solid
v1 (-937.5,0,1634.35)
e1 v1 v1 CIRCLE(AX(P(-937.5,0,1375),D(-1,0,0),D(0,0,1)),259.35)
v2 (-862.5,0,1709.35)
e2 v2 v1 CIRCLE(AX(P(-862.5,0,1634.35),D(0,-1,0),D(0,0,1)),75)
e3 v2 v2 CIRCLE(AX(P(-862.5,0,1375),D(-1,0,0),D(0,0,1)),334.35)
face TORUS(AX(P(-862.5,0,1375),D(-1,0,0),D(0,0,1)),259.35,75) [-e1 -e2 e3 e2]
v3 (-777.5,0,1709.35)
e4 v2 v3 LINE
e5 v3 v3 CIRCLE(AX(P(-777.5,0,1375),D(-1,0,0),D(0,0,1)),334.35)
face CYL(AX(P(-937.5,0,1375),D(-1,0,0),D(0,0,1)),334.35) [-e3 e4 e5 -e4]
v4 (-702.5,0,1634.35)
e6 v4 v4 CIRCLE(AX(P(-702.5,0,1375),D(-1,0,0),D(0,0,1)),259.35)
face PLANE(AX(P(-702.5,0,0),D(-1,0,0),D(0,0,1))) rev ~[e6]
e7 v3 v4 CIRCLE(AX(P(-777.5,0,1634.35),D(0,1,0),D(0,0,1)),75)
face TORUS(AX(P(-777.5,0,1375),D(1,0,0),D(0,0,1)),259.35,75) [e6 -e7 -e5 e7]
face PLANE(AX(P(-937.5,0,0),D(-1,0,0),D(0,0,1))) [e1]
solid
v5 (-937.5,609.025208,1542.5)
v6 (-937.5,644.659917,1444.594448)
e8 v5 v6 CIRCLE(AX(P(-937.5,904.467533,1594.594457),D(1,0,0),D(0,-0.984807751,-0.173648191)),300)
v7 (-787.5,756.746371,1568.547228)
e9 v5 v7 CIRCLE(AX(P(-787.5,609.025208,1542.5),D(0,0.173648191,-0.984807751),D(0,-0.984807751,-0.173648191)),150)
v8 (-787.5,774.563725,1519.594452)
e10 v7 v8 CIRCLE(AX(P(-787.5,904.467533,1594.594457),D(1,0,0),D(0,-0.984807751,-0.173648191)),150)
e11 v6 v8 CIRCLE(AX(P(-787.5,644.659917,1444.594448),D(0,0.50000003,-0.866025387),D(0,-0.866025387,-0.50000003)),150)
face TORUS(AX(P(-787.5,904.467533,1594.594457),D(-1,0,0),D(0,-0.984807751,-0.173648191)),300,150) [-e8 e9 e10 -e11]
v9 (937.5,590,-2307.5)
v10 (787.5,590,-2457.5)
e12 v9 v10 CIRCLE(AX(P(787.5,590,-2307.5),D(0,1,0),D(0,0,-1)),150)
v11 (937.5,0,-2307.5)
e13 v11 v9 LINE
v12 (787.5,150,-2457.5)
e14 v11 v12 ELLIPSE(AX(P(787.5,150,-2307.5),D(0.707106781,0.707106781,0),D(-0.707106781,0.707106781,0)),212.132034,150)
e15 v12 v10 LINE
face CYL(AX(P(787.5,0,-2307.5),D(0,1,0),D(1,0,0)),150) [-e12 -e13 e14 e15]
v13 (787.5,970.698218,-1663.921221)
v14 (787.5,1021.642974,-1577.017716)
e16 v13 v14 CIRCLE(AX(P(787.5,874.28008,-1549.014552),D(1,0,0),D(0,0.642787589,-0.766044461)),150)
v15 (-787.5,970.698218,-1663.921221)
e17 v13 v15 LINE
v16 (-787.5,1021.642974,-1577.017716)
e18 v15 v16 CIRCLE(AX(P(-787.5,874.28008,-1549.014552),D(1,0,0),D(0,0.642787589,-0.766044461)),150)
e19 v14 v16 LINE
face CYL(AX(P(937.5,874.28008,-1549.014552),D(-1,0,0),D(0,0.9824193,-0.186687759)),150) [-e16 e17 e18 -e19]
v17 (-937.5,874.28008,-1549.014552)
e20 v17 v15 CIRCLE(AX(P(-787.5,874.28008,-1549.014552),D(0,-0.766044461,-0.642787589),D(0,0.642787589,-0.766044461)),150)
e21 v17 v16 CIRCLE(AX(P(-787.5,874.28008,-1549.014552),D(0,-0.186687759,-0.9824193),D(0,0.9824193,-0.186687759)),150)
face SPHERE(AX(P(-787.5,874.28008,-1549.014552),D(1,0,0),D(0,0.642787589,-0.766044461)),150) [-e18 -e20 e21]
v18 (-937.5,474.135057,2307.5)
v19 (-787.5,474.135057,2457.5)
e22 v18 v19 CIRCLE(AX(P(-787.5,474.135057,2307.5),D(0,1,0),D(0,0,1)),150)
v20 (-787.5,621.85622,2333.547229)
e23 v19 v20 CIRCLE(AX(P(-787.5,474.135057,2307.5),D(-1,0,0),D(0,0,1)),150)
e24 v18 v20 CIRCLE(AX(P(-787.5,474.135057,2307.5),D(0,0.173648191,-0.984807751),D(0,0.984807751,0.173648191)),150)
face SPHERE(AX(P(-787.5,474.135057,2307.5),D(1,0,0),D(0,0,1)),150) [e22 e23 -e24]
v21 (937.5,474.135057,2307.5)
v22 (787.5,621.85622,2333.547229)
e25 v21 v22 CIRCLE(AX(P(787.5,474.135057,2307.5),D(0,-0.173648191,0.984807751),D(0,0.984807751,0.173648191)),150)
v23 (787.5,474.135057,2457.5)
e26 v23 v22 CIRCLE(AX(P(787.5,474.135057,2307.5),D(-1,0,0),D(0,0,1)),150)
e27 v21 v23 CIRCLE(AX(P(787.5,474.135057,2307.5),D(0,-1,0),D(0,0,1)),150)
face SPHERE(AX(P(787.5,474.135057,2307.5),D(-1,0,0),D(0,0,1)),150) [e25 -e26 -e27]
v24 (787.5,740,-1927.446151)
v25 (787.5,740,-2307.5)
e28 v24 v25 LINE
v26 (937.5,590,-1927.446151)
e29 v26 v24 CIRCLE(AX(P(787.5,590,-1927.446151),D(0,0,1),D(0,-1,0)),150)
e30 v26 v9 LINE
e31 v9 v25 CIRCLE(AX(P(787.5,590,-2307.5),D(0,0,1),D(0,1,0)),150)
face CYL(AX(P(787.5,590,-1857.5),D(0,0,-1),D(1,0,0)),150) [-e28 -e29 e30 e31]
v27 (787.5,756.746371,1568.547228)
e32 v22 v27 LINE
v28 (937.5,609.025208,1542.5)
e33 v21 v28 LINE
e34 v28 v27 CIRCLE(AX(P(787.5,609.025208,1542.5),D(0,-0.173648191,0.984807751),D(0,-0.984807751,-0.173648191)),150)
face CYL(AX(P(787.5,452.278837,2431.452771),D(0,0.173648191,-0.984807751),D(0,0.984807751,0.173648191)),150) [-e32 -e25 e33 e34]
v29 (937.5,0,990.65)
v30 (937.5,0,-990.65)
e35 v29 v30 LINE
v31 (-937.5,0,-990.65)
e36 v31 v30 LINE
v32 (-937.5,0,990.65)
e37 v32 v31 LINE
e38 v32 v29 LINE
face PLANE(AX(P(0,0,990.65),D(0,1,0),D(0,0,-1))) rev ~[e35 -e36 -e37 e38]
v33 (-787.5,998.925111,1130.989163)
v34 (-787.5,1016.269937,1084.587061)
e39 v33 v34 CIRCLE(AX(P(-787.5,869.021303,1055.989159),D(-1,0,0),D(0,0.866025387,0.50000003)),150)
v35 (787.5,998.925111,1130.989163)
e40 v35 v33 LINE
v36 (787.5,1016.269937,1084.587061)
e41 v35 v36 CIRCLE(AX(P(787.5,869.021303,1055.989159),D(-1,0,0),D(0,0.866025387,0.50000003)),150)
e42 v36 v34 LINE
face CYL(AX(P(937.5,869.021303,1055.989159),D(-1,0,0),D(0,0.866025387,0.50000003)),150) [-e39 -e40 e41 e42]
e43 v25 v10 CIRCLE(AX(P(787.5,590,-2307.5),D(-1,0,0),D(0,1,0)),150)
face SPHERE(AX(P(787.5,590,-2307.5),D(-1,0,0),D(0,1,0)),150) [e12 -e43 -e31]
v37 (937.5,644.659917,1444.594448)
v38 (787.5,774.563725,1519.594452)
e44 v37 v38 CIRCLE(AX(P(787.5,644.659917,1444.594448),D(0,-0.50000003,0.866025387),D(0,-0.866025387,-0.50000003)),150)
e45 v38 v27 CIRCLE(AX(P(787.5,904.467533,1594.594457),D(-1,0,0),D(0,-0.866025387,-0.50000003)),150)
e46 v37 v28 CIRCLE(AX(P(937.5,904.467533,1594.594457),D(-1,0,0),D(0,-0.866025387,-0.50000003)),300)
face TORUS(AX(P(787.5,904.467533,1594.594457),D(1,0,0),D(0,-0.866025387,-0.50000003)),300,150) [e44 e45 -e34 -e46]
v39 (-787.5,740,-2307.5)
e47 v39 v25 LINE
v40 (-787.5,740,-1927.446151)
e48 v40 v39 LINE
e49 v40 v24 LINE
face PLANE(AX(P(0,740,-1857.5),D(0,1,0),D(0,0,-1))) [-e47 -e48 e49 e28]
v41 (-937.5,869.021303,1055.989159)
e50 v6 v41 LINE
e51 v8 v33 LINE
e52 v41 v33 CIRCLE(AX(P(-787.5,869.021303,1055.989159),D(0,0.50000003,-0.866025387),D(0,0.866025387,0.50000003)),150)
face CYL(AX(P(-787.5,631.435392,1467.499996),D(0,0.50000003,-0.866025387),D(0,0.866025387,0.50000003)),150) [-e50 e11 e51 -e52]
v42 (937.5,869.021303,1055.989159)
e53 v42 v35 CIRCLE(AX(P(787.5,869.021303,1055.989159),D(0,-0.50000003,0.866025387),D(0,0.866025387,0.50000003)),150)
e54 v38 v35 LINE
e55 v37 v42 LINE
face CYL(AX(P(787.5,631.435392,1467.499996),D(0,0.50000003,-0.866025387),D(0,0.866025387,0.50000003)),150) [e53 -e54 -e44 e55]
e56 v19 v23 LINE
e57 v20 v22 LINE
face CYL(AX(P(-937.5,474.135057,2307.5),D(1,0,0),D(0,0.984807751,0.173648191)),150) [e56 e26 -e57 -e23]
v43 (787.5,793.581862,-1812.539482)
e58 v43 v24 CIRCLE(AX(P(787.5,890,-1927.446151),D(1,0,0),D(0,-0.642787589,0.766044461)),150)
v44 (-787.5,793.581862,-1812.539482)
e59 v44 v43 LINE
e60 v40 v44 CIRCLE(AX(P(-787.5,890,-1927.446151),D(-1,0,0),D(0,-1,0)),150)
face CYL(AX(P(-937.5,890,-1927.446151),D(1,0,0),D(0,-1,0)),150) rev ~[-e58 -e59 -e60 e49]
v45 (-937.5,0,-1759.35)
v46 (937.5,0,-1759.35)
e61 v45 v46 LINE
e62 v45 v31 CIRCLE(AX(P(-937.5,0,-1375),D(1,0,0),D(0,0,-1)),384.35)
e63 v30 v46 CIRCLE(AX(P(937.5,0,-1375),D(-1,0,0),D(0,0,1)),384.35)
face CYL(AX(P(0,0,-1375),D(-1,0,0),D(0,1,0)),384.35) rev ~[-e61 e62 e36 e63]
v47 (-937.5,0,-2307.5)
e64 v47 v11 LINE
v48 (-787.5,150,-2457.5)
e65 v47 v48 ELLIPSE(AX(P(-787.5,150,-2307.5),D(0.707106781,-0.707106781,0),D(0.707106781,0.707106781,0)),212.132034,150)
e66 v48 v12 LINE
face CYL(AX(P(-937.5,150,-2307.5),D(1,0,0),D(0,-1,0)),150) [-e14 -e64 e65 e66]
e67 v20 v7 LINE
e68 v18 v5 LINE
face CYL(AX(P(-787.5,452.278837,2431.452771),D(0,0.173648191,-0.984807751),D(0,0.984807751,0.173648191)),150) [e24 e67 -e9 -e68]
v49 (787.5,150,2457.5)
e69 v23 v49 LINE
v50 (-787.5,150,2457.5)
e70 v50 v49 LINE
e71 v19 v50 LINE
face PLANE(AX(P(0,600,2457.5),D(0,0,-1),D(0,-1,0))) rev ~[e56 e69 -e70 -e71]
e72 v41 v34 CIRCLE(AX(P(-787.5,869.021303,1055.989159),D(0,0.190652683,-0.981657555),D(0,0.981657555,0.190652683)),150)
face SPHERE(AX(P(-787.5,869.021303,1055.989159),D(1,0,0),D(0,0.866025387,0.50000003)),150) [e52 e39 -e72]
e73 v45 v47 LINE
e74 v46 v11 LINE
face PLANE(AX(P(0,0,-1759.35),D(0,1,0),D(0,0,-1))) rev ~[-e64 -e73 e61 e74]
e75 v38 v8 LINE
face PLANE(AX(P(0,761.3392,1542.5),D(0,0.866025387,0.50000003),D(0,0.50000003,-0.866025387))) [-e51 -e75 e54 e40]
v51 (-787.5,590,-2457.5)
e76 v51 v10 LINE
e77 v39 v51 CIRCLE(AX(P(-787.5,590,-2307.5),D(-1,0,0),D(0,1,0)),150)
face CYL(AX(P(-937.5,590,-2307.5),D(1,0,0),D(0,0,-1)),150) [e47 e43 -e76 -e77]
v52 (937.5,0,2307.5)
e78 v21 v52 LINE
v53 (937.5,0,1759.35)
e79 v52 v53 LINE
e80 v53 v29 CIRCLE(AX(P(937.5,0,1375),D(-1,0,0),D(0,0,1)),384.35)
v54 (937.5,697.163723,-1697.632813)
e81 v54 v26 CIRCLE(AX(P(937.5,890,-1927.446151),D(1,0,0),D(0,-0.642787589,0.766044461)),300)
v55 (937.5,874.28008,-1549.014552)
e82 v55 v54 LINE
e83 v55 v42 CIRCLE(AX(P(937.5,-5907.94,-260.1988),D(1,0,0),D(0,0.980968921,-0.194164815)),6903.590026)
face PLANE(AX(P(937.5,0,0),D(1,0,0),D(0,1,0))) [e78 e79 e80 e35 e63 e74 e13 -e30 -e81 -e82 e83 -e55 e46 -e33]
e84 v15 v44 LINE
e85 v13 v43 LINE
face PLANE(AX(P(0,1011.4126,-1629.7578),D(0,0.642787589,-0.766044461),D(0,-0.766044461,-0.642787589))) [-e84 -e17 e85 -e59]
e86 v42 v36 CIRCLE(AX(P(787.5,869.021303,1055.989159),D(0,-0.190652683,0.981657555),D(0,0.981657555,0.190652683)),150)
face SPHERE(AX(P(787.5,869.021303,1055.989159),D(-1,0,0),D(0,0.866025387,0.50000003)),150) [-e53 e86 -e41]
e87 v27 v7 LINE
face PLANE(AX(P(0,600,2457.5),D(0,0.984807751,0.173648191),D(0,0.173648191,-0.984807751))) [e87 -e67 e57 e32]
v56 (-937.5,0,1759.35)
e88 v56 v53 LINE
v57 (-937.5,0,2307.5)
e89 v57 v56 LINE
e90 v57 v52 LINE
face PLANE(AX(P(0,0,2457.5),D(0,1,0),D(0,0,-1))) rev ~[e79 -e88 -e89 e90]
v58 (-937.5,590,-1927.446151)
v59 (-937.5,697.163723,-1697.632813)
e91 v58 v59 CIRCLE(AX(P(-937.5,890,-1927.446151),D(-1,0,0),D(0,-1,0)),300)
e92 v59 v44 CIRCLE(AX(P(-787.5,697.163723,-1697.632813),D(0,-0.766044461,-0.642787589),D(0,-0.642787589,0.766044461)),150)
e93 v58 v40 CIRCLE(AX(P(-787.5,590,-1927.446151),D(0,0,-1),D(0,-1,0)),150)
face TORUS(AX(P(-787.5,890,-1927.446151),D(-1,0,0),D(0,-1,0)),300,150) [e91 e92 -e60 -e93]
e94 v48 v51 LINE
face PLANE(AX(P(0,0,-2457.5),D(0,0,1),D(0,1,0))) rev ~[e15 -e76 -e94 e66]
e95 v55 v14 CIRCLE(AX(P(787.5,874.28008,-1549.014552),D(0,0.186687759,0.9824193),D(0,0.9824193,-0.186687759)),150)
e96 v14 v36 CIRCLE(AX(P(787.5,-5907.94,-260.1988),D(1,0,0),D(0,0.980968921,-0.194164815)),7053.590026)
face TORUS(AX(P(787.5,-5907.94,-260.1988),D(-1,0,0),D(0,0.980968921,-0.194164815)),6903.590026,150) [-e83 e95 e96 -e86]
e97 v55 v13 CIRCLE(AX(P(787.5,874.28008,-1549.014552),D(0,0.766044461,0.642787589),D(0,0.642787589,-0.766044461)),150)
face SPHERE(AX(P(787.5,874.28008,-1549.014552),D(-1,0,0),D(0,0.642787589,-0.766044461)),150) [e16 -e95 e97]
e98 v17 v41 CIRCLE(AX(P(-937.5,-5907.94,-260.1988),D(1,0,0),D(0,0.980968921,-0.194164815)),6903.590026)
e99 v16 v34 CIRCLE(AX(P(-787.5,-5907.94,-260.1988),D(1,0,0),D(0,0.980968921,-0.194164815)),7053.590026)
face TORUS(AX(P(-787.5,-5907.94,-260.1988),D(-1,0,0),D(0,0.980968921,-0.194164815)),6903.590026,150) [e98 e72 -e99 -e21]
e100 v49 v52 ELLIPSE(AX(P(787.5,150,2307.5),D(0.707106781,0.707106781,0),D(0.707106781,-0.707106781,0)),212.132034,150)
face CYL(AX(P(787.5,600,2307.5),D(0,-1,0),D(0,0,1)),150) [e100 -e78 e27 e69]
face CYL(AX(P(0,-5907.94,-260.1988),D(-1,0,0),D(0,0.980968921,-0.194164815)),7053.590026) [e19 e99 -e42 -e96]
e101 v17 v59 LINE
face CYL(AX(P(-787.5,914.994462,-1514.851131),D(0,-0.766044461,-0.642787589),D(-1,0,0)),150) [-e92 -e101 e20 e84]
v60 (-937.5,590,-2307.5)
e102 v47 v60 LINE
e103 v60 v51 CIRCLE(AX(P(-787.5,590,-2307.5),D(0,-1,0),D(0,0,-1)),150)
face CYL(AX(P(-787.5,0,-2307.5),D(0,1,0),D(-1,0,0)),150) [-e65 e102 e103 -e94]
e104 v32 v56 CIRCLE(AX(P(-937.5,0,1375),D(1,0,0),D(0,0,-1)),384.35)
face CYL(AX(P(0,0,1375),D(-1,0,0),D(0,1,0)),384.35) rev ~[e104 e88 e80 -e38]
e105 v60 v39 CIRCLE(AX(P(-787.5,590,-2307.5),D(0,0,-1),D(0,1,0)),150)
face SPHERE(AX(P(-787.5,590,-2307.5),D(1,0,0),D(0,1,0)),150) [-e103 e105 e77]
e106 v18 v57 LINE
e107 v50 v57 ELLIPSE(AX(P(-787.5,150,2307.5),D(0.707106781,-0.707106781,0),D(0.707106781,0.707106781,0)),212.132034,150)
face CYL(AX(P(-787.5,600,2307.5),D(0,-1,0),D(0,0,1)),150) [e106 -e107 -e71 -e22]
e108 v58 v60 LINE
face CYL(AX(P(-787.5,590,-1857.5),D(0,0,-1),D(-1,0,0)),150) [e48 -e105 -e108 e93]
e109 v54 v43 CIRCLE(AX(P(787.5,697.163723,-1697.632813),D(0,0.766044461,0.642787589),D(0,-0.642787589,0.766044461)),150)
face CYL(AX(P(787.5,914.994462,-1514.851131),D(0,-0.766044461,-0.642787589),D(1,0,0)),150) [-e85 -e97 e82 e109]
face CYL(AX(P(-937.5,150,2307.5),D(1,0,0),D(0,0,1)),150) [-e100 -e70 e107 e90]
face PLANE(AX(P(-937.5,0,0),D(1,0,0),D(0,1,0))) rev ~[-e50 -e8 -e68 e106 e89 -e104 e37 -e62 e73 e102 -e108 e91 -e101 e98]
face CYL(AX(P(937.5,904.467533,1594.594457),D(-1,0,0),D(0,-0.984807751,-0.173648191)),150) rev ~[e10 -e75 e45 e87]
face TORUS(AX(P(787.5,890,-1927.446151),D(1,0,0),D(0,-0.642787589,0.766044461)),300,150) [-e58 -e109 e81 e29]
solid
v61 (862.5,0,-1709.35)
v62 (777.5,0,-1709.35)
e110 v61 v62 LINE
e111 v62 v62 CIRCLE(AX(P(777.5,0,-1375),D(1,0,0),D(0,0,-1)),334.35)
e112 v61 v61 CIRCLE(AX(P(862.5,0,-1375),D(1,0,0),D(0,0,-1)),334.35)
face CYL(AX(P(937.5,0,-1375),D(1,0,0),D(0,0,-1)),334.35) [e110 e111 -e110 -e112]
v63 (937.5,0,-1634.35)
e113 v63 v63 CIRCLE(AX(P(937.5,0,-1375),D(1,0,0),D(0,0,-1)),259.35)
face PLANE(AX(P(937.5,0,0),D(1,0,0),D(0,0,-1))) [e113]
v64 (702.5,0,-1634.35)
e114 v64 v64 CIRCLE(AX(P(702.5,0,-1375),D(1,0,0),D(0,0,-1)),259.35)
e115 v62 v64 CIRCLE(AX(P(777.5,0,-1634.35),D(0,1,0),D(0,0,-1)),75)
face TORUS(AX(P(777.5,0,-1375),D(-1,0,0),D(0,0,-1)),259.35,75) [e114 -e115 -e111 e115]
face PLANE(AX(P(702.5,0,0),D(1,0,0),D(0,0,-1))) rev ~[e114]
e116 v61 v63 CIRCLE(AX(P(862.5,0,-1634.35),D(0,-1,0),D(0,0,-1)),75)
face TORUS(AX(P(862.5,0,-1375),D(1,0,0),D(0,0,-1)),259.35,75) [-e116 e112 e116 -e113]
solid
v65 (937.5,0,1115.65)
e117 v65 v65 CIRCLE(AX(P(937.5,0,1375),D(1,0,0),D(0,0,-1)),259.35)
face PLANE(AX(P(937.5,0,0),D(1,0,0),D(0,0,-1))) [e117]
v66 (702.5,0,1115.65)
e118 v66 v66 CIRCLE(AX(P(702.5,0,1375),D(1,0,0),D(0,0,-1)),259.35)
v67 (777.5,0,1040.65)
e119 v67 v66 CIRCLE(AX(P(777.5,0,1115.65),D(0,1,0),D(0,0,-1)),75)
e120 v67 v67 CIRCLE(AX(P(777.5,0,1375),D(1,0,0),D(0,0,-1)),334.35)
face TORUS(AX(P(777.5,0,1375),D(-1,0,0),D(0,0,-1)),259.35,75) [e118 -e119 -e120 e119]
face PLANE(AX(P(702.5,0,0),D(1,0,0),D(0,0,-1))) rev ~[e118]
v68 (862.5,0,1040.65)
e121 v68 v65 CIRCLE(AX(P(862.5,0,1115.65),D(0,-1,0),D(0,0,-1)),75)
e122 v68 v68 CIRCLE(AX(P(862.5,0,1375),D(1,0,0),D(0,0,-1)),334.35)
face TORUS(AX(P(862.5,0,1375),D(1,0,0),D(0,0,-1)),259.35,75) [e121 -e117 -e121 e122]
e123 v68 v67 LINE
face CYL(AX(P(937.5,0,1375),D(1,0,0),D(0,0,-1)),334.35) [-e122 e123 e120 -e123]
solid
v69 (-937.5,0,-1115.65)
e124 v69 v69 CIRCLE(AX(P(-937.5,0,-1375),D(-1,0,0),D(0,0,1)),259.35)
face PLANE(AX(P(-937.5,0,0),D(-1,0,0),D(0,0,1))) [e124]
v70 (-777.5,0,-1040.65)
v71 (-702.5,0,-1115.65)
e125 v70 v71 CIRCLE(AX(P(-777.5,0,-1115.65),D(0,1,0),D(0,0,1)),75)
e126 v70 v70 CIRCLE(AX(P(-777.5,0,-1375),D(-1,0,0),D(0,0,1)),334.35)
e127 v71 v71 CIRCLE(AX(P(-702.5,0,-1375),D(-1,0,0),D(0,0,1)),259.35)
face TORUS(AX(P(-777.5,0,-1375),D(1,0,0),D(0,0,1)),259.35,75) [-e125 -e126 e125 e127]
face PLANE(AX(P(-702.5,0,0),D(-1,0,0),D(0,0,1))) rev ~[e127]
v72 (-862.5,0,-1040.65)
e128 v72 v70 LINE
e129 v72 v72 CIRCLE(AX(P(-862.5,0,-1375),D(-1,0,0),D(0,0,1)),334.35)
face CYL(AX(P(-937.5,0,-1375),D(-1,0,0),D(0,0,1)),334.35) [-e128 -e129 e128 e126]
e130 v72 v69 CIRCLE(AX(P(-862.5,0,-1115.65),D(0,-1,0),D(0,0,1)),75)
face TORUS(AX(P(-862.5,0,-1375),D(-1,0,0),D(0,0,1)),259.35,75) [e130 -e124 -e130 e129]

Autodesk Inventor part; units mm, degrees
ref_plane "YZ Plane" through (0, 0, 0) normal (1, 0, 0) x (0, 1, 0)
ref_plane "XZ Plane" through (0, 0, 0) normal (0, 1, 0) x (-1, 0, 0)
ref_plane "XY Plane" through (0, 0, 0) normal (0, 0, 1) x (1, 0, 0)
sketch "Sketch1" plane through (0, 0, 0) normal (1, 0, 0) x (0, 1, 0)
  line L0 (600, 2457.5) -> (0, 2457.5)
  line L1 (0, 2457.5) -> (0, -2457.5)
  circle A0 centre (0, 1375) radius 334.35
  circle A1 centre (0, -1375) radius 334.35
  line L2 (0, 1375) -> (0, -1375) construction
  line L3 (761.3392, 1542.5) -> (1011.4126, 1109.3602)
  line L4 (1011.4126, 1109.3602) -> (1011.4126, -1629.7578)
  line L5 (1011.4126, -1629.7578) -> (740, -1857.5)
  line L6 (740, -1857.5) -> (740, -2457.5)
  line L7 (-334.35, -1040.65) -> (-334.35, -1709.35) construction
  line L8 (600, 2457.5) -> (761.3392, 1542.5)
  line L9 (0, -2457.5) -> (740, -2457.5)
  circle A2 centre (0, 1375) radius 384.35
  circle A3 centre (0, -1375) radius 384.35
  arc A4 (1011.4126, -1629.7578) -> (1011.4126, 1109.3602) centre (-5907.94, -260.1988) ccw
  line L10 (1145.65, 637.3331) -> (1145.65, -1157.7308) construction
  point P0 (0, 0)
  point P1 (0, 0)
  point P2 (-334.35, -1375)
  point P3 (0, 1759.35)
  point P4 (0, 990.65)
  point P5 (0, -990.65)
  point P6 (0, -1759.35)
  point P7 (1145.65, -260.1988)
  dimension "d0" = 668.7
  dimension "d1" = 2750
  dimension "d2" = 4915
  dimension "d4" = 50
  dimension "d5" = 50
  dimension "d6" = 100
  dimension "d7" = 150
  dimension "d8" = 915
  dimension "d9" = 600
  dimension "d10" = 740
  dimension "d11" = 130
  dimension "d12" = 600
  dimension "d22" = 1480
extrude "Extrusion1" add sketch "Sketch1" along normal mid plane 1875 contours L8 L3 L4 L5 L6 L9 L1 A3 A2 L0 | A4 L4
sketch "Sketch2" plane through (937.5, 0, 0) normal (1, 0, 0) x (0, 0, -1)
  circle A0 centre (-1375, 0) radius 334.35 projected
  circle A1 centre (1375, 0) radius 334.35 projected
  point P0 (0, 0)
extrude "Extrusion2" add sketch "Sketch2" against normal blind 235
sketch "Sketch3" plane through (-937.5, 0, 0) normal (-1, 0, 0) x (0, 0, 1)
  circle A0 centre (-1375, 0) radius 334.35 projected
  circle A1 centre (1375, 0) radius 334.35 projected
  point P0 (0, 0)
extrude "Extrusion3" add sketch "Sketch3" against normal blind 235
fillet "Fillet1" radius 150 22 edges at (0, 740, -2457.5) (0, 740, -1857.5) (0, 1011.4126, -1629.7578) (0, 1011.4126, 1109.3602) (0, 761.3392, 1542.5) (0, 600, 2457.5) (0, 0, 2457.5) (-937.5, 300, 2457.5) (937.5, 300, 2457.5) (-937.5, 680.6696, 2000) (-937.5, 886.3759, 1325.9301) (937.5, 886.3759, 1325.9301) (937.5, 680.6696, 2000) (-937.5, 740, -2157.5) (937.5, 875.7063, -1743.6289) (937.5, 740, -2157.5) (937.5, 370, -2457.5) (0, 0, -2457.5) (-937.5, 370, -2457.5) (-937.5, 875.7063, -1743.6289) (937.5, 1145.65, -260.1988) (-937.5, 1145.65, -260.1988)
fillet "Fillet2" radius 75 8 edges at (937.5, 0, 1709.35) (937.5, 0, -1040.65) (702.5, 0, -1040.65) (702.5, 0, 1709.35) (-702.5, 0, 1040.65) (-937.5, 0, 1040.65) (-702.5, 0, -1709.35) (-937.5, 0, -1709.35)
properties part number "BungaCamp-Sedan"
